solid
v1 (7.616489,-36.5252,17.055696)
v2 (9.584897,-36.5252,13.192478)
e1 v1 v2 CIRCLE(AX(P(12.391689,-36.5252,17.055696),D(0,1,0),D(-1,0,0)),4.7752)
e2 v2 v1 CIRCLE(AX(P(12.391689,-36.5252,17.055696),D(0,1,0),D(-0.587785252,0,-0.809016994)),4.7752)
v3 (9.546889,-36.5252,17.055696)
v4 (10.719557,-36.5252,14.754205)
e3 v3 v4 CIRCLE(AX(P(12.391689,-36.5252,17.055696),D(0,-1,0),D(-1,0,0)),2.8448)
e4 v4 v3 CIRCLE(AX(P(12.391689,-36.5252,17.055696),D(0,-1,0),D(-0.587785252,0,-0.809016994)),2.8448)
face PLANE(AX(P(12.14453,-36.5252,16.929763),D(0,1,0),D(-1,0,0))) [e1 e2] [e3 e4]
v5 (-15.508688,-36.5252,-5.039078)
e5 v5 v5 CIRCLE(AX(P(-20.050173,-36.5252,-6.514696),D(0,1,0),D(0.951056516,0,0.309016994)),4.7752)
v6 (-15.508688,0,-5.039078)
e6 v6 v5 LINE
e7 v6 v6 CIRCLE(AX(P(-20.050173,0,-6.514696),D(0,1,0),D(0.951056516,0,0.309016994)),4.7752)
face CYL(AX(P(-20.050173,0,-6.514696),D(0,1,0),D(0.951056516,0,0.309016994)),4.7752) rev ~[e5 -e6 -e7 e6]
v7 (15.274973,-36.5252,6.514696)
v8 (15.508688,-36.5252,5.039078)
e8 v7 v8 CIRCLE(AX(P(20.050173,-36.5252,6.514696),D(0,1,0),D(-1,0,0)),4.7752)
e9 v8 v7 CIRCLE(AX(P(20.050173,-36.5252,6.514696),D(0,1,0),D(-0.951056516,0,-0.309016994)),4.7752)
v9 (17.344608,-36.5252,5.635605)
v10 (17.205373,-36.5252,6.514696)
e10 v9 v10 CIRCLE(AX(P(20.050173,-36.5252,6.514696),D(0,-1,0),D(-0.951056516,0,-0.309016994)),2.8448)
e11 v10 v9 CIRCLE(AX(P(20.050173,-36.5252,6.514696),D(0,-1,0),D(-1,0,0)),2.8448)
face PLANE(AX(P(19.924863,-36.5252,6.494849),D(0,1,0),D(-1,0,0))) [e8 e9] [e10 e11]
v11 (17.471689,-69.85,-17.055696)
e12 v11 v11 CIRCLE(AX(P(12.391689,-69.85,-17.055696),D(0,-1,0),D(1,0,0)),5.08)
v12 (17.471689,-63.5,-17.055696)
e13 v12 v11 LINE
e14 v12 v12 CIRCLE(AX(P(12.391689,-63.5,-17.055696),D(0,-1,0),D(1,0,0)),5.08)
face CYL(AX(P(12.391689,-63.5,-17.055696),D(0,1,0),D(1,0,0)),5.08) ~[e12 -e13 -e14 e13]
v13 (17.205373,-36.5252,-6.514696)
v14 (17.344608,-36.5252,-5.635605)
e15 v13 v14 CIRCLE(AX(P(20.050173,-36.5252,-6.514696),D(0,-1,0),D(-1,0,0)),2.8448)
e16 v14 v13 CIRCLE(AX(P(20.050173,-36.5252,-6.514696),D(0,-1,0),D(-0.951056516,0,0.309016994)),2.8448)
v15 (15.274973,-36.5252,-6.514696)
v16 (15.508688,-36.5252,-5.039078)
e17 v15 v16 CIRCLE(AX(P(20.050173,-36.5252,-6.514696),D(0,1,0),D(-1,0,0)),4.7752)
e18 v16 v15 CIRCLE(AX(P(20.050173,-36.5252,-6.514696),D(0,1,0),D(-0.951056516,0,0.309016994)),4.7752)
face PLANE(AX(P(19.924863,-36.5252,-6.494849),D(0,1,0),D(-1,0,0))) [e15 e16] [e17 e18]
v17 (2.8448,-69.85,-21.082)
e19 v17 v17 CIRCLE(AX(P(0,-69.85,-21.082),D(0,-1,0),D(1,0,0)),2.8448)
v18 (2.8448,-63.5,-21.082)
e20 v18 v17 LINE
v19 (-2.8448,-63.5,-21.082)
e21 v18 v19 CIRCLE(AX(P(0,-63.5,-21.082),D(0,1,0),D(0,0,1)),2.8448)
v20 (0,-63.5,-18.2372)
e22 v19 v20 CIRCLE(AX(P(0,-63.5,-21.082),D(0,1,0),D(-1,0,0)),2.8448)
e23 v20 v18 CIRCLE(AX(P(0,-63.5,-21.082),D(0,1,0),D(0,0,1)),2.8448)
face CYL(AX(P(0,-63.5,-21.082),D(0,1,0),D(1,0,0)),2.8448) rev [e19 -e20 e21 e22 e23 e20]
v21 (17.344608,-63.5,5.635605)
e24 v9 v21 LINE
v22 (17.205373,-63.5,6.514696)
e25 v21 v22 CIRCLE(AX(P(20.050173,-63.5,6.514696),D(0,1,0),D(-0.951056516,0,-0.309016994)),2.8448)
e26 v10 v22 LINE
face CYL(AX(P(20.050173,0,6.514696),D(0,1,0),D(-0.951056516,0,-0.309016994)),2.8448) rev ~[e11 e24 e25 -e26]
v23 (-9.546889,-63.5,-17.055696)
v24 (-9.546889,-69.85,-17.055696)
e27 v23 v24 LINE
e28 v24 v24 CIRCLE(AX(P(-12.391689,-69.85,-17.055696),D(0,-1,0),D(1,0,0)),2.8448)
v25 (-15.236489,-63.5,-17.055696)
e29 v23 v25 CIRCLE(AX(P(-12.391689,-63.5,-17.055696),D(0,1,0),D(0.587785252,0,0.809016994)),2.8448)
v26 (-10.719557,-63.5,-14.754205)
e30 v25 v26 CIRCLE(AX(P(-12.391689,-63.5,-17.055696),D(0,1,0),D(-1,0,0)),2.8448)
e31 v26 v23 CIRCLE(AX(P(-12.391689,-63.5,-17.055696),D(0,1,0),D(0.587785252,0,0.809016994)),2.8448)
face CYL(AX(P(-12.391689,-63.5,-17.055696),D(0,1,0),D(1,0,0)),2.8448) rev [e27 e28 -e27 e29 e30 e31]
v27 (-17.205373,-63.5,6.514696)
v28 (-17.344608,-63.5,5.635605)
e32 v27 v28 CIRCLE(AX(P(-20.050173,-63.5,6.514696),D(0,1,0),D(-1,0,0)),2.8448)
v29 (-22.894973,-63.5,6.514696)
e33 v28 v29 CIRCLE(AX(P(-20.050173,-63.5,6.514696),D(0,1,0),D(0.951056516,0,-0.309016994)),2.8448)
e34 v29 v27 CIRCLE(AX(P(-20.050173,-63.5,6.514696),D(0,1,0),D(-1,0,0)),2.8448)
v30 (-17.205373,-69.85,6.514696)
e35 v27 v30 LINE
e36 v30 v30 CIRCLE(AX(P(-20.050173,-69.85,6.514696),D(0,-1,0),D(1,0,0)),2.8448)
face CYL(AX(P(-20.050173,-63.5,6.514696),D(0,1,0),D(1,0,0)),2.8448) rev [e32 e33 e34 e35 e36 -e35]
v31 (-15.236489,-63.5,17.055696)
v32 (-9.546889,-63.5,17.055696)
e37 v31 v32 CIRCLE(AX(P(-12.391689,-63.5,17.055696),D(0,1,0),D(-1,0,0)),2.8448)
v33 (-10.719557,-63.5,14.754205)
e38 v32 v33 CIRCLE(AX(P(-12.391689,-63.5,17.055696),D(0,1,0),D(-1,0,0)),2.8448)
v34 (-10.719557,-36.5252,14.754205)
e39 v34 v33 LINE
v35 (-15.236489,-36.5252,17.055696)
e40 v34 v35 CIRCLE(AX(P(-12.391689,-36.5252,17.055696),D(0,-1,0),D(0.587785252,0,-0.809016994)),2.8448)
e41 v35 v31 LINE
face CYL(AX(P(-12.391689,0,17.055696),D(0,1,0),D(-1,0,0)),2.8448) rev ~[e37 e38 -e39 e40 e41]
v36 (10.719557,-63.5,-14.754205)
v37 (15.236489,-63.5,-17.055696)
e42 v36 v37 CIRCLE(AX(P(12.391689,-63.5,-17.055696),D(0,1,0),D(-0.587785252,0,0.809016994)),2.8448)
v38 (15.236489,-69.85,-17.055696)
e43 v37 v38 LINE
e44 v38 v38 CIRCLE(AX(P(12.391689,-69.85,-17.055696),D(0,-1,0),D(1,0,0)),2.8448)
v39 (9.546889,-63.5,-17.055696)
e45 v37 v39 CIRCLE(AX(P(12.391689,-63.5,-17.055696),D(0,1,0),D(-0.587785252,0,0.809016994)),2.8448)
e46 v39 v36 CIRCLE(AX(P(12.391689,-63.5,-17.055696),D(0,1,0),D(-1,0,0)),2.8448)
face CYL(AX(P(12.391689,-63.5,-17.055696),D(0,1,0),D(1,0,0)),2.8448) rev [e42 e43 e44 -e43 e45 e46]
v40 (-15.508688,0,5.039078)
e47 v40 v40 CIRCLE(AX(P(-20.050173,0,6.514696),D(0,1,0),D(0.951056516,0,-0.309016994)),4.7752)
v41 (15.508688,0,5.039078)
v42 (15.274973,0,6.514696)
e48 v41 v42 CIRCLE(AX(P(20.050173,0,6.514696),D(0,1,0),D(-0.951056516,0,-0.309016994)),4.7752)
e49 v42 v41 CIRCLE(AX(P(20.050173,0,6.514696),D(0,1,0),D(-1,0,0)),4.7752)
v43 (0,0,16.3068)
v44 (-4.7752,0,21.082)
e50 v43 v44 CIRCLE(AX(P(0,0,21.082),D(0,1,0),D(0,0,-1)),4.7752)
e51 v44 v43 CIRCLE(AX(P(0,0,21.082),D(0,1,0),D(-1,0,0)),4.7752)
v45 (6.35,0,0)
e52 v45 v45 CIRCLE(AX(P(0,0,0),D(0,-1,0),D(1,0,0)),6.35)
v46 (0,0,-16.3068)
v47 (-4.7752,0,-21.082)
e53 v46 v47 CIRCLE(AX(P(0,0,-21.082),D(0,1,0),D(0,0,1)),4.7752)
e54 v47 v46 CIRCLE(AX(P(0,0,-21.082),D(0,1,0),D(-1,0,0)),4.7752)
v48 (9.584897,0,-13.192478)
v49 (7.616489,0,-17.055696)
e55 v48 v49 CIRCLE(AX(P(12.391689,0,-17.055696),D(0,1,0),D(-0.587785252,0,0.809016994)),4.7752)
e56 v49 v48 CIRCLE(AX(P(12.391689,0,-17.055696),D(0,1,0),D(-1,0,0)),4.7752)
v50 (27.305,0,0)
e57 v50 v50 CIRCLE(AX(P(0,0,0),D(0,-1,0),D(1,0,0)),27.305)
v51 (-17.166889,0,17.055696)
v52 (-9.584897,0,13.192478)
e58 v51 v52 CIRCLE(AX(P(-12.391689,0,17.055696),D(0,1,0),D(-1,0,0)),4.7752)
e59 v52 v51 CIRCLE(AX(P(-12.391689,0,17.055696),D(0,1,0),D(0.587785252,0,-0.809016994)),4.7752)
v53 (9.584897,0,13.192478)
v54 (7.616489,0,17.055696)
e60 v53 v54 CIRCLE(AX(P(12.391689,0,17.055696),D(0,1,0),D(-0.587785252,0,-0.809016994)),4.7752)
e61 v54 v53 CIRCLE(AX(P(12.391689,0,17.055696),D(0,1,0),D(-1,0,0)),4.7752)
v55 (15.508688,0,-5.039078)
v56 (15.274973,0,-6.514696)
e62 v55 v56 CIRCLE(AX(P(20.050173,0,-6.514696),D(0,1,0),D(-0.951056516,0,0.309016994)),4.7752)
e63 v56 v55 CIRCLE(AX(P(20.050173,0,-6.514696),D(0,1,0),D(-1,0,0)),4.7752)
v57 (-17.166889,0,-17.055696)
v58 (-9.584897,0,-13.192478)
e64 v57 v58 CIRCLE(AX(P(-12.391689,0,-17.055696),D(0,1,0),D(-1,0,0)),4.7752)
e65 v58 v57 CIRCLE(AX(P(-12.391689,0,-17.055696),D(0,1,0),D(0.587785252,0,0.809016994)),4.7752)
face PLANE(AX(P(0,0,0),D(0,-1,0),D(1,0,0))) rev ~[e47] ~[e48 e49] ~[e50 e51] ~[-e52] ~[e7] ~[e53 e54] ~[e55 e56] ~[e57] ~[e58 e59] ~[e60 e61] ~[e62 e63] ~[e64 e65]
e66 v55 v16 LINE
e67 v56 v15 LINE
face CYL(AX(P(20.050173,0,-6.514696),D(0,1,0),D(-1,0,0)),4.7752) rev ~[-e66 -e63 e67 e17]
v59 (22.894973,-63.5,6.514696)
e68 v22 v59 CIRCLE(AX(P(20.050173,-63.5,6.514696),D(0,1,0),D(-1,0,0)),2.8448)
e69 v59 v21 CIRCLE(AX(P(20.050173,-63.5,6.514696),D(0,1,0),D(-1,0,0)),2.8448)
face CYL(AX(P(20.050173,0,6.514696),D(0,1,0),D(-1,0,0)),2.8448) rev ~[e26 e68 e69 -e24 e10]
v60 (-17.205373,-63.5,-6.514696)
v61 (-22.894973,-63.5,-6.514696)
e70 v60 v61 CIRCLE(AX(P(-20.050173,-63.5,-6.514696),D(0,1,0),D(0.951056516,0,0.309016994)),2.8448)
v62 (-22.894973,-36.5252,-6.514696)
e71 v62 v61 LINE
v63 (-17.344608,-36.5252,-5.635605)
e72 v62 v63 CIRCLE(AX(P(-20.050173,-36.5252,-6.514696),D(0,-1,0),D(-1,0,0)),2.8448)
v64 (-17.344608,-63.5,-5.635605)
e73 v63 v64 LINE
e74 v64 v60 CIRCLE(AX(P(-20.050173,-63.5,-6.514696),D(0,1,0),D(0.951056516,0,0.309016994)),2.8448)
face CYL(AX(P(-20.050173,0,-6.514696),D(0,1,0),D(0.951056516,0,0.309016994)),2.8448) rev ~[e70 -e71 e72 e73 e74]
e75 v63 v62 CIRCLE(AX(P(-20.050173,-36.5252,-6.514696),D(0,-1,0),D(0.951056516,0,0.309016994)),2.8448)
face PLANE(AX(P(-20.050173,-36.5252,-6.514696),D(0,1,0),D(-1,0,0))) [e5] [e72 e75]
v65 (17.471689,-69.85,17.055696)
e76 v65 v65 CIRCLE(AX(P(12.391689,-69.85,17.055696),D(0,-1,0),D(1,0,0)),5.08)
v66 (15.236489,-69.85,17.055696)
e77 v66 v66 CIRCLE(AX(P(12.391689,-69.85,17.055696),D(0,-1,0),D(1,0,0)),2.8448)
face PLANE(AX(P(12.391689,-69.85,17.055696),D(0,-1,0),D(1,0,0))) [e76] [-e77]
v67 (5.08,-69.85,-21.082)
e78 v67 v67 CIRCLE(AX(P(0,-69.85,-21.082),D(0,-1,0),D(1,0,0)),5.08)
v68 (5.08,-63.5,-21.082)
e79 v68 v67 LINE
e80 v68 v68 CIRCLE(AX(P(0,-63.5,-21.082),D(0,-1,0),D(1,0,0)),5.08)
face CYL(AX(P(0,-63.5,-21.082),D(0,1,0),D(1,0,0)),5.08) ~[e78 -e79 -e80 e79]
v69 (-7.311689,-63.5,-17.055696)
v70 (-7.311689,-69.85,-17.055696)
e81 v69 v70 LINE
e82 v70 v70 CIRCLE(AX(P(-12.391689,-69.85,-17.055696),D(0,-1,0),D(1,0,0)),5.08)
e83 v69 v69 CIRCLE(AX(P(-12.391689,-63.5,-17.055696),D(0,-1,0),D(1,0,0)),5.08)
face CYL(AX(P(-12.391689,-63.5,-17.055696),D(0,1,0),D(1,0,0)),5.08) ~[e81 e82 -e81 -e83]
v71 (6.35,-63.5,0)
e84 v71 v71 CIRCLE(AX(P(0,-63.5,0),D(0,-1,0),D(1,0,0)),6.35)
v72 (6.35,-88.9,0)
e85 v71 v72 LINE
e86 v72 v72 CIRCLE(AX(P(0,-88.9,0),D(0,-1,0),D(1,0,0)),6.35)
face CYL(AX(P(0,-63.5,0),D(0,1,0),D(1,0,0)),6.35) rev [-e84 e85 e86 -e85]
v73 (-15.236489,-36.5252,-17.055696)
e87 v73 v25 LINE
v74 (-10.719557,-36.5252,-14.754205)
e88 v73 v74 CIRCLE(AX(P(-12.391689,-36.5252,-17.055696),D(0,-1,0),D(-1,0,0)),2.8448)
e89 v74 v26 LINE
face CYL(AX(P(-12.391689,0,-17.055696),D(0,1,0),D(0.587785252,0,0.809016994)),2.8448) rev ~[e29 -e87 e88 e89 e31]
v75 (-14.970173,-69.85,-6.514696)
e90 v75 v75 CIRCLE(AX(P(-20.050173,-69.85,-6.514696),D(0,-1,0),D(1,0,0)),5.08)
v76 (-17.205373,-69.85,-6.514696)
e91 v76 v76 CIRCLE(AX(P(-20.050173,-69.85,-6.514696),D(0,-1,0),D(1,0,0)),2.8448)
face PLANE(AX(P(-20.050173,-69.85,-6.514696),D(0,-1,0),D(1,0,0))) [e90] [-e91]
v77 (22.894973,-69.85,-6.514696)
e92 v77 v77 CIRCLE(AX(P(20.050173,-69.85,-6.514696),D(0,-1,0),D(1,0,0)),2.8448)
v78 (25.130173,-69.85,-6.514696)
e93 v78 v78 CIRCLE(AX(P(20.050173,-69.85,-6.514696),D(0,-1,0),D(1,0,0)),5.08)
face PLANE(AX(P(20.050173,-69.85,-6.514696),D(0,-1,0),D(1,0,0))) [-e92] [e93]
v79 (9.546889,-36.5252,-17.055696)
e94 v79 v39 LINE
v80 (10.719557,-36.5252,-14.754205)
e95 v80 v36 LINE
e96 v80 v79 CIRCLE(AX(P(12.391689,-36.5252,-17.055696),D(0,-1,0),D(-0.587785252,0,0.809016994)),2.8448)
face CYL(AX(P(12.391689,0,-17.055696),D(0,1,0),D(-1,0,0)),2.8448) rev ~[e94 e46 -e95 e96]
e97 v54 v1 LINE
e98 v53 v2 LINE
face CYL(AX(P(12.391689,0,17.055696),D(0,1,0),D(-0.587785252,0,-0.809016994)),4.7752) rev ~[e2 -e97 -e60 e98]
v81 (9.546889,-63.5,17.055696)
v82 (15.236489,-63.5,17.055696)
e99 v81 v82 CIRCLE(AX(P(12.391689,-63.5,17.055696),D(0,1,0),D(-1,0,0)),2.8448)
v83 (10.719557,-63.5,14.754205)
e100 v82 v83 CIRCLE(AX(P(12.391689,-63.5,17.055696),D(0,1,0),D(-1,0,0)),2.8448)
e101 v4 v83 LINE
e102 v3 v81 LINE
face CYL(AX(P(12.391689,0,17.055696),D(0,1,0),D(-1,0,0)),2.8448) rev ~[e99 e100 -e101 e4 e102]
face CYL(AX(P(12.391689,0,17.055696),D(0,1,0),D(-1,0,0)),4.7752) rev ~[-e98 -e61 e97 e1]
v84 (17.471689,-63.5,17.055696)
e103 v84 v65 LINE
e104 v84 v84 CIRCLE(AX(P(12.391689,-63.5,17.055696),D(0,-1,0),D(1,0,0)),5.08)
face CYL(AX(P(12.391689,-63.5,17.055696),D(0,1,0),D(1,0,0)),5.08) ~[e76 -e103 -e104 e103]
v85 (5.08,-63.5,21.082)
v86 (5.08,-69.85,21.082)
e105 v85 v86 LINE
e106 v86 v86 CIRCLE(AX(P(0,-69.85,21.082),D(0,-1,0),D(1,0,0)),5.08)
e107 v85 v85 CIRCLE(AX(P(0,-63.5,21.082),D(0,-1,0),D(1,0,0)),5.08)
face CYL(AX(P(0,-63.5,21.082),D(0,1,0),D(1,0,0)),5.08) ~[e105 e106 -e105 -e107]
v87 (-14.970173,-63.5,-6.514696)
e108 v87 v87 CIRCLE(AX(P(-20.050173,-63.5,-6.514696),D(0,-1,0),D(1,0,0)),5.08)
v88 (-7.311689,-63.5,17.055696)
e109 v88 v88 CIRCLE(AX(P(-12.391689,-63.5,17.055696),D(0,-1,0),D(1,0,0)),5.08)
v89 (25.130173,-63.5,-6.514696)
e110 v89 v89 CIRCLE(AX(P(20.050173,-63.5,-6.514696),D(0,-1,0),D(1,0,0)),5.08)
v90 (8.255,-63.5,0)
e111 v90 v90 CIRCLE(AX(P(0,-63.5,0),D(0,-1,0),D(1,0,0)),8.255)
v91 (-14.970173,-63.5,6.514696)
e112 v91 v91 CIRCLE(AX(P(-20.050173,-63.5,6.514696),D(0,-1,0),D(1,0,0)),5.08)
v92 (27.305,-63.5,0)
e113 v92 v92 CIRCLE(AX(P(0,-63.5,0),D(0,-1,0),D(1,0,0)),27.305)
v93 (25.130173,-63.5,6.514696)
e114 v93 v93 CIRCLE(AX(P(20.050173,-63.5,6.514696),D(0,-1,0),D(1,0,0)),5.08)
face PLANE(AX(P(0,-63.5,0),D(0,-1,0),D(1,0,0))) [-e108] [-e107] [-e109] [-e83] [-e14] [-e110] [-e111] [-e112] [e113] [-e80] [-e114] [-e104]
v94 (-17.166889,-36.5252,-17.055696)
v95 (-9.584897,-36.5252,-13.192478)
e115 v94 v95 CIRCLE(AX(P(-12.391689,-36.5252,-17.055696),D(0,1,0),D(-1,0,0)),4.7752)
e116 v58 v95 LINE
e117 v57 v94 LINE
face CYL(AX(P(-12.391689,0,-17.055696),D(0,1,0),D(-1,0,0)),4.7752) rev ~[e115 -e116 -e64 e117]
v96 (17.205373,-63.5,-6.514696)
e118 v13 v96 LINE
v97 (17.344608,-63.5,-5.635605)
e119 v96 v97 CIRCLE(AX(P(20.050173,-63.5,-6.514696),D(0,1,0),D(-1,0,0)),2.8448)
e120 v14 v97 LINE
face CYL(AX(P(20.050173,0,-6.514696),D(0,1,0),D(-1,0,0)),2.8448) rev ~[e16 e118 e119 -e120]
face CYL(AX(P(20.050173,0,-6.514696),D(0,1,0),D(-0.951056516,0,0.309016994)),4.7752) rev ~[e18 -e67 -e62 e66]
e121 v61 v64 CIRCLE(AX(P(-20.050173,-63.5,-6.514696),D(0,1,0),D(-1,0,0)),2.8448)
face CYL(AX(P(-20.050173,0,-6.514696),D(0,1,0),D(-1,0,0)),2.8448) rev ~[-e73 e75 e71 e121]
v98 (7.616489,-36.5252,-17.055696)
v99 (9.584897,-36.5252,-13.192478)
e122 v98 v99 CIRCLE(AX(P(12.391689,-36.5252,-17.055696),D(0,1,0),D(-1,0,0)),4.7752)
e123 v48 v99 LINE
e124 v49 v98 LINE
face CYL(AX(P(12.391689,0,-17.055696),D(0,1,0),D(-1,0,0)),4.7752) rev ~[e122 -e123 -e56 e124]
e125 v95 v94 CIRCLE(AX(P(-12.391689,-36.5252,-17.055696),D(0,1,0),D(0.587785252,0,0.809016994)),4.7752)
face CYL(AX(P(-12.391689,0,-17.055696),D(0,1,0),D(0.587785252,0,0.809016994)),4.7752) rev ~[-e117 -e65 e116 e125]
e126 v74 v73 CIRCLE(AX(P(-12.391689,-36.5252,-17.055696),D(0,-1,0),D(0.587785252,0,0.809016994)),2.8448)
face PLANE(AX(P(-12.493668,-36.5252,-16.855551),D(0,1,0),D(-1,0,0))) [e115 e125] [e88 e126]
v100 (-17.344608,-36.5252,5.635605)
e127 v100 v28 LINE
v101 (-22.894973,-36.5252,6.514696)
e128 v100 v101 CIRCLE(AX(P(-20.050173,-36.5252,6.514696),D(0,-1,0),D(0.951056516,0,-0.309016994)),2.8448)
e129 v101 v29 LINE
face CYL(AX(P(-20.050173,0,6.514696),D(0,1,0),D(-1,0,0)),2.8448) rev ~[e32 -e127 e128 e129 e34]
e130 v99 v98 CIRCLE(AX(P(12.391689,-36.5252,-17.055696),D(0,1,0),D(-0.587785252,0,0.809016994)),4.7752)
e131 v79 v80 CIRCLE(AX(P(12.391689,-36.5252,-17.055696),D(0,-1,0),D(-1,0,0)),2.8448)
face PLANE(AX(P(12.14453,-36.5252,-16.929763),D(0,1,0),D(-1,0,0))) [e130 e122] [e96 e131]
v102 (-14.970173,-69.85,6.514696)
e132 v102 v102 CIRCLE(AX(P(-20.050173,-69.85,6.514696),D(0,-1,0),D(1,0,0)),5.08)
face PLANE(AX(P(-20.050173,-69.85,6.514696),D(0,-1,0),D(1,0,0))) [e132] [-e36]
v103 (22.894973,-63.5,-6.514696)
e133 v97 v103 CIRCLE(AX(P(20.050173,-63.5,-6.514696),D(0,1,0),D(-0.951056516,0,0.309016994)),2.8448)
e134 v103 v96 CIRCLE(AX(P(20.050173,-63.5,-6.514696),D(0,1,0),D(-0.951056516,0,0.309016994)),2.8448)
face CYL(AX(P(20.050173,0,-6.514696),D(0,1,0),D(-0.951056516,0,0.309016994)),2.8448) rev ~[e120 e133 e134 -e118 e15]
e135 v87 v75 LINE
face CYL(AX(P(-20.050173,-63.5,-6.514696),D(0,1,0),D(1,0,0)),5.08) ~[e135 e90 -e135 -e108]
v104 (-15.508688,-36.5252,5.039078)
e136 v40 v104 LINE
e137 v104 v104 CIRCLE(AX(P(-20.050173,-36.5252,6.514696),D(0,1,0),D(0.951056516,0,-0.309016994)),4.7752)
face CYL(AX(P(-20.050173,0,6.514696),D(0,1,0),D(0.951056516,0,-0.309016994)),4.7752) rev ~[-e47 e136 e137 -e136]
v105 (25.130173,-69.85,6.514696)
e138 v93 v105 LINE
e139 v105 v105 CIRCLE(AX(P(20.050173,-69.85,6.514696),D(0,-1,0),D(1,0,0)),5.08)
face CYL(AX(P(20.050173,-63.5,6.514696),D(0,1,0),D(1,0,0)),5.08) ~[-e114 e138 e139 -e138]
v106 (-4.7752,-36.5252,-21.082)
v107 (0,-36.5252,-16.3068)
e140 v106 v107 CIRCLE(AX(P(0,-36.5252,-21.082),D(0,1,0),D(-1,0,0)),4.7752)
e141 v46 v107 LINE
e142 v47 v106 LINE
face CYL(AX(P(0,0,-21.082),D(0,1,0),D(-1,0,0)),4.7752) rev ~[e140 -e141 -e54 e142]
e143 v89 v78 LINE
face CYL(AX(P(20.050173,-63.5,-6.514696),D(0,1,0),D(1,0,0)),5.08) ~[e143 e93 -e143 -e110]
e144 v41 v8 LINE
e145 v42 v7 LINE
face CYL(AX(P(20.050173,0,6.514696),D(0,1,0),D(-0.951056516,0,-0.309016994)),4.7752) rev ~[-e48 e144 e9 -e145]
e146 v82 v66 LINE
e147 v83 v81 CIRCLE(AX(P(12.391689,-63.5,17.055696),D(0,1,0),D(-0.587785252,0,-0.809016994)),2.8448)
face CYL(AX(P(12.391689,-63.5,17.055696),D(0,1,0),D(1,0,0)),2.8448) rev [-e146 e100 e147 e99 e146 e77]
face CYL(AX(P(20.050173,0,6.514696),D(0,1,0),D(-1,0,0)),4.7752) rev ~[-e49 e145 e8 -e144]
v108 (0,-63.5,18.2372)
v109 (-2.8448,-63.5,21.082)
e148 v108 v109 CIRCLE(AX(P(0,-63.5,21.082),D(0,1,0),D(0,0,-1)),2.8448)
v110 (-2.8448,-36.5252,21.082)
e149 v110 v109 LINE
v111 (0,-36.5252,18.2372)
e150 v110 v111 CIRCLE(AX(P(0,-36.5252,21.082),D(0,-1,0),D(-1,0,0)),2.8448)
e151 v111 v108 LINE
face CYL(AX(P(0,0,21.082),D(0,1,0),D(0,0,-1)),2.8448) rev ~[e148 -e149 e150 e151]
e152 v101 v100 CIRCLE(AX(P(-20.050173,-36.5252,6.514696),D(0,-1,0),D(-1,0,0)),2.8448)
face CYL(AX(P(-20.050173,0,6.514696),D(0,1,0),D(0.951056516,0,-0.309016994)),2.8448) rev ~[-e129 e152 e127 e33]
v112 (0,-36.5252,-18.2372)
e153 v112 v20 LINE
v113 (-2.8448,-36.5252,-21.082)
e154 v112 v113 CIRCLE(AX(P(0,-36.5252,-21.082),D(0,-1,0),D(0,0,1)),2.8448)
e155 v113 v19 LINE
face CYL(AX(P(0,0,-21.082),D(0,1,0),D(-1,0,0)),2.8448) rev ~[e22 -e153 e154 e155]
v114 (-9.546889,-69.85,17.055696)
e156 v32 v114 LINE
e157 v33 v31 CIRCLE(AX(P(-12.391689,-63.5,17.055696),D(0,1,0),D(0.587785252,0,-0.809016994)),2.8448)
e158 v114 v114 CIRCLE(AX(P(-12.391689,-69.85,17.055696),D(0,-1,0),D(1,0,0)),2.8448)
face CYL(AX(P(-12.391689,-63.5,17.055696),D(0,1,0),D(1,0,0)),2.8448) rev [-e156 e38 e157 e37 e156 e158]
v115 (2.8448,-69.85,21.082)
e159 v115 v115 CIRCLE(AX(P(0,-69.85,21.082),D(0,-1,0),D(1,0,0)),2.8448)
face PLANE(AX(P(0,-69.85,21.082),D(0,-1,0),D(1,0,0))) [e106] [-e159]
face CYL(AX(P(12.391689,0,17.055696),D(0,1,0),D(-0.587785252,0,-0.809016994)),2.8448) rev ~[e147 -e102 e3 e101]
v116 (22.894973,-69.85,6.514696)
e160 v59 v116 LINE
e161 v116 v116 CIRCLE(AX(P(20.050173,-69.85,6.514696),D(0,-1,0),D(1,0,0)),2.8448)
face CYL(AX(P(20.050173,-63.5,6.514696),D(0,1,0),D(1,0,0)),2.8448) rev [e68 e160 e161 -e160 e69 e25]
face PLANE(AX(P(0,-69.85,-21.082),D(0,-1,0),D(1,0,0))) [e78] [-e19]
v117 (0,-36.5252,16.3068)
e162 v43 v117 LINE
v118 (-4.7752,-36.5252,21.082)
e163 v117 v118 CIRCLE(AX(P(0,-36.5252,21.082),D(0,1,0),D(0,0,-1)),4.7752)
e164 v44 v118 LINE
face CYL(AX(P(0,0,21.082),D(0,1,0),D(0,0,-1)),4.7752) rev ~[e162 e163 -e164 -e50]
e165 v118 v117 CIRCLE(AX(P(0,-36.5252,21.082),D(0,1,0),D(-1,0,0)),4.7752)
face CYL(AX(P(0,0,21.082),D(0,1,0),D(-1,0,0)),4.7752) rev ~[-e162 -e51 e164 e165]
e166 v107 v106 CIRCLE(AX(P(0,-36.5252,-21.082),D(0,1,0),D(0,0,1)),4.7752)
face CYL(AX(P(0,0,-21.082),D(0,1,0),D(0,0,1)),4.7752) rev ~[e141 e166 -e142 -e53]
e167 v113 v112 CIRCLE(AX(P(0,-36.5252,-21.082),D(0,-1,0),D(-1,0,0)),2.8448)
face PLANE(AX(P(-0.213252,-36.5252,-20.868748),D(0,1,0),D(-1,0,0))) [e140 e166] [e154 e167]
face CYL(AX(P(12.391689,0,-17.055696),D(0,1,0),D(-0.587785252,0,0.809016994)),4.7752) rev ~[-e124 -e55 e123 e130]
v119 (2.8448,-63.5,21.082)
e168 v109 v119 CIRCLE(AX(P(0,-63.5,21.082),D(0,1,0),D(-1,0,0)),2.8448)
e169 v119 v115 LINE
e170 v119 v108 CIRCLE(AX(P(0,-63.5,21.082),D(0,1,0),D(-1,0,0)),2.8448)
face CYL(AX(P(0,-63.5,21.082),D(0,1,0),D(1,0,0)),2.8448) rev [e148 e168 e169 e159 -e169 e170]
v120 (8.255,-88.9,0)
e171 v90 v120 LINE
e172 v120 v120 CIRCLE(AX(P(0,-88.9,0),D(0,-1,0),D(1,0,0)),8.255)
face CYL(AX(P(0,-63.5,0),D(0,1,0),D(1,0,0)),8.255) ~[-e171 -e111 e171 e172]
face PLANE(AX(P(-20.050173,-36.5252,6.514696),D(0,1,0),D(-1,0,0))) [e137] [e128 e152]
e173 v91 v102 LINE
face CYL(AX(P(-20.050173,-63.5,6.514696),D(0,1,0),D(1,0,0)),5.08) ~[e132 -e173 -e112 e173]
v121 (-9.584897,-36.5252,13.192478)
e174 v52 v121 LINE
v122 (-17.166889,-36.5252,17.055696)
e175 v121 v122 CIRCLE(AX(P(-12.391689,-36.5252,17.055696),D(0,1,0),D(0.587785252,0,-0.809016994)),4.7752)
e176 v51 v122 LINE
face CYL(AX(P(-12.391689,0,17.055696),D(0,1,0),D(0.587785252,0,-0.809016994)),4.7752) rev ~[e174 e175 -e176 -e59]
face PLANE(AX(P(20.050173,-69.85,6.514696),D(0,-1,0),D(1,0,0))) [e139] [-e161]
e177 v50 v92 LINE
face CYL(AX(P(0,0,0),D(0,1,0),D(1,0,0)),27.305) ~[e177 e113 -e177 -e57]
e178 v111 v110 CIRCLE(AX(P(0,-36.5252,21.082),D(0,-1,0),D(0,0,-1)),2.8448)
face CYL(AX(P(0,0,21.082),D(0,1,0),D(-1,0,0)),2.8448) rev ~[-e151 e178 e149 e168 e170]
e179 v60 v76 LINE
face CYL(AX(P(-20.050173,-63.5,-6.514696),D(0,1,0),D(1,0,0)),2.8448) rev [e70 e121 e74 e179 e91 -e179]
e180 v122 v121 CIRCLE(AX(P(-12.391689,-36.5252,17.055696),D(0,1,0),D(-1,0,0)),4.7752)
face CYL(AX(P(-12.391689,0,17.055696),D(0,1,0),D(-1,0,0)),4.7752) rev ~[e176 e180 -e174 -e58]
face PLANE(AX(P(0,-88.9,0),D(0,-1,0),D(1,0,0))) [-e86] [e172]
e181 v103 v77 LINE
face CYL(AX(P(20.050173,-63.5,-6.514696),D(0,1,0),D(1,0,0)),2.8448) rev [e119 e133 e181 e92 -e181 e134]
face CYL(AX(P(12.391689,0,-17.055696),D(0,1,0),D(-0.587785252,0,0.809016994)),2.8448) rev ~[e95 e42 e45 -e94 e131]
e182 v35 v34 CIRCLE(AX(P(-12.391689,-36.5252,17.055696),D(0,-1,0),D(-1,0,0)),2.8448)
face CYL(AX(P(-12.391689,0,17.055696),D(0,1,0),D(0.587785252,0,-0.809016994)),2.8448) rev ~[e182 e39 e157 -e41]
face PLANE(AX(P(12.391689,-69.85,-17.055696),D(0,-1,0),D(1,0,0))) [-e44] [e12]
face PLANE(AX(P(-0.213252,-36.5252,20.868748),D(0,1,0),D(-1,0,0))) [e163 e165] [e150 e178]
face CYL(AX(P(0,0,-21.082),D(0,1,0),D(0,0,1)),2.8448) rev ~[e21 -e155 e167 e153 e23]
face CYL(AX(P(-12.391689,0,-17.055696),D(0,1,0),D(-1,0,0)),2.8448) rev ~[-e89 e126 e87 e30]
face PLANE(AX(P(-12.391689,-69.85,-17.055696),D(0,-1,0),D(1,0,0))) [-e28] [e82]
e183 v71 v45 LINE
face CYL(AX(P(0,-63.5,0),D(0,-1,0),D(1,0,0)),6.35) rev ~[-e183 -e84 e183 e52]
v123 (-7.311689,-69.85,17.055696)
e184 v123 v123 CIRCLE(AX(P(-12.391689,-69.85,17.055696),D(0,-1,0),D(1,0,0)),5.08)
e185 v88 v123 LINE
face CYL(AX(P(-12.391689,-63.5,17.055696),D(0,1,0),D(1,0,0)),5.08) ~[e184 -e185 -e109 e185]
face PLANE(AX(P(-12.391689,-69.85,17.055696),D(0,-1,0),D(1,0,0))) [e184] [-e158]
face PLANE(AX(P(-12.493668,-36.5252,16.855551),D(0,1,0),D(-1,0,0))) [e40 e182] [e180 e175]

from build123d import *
from build123d import SkipClean  # not in build123d's __all__

# Parameters (mm, degrees)
F0_R     = 27.305
F1_DEPTH = 63.5
F3_DEPTH = 86.614
F4_R     = 5.08
F4_R_2   = 2.8448
F5_DEPTH = 6.35
F6_R     = 8.255
F6_R_2   = 6.35
F7_DEPTH = 25.4
F8_DEPTH = 36.5252
F9_DEPTH = 133.35


# Not quite as in the source:
# - after a boolean that leaves OpenCascade's solid faulty, fix() repairs it


with BuildPart() as f1:
    # F0 (on Front) → F1 (new body)
    with BuildSketch(Plane.XZ):
        Circle(F0_R)
    extrude(amount=F1_DEPTH)

    # F2 (on face) → F3 (cut)
    with BuildSketch(Plane(origin=(0, 0, 0), x_dir=(-1, 0, 0), z_dir=(0, 1, 0))):
        with BuildLine():
            ThreePointArc((-17.2053734765, -6.5146962754), (-17.2403976852, -6.0696715093), (-17.344607899, -5.6356047298))
            ThreePointArc((-17.344607899, -5.6356047298), (-22.8599492679, -6.9597210416), (-17.2053734765, -6.5146962754))
        make_face()
        with BuildLine():
            ThreePointArc((-17.2053734765, 6.5146962754), (-22.8599492679, 6.9597210416), (-17.344607899, 5.6356047298))
            ThreePointArc((-17.344607899, 5.6356047298), (-17.2403976852, 6.0696715093), (-17.2053734765, 6.5146962754))
        make_face()
        with BuildLine():
            ThreePointArc((-9.5468886888, 17.0556962754), (-14.9264240488, 18.3472084491), (-10.7195572031, 14.7542047298))
            ThreePointArc((-10.7195572031, 14.7542047298), (-9.8569533288, 15.7641841018), (-9.5468886888, 17.0556962754))
        make_face()
        with BuildLine():
            ThreePointArc((2.8448, 21.082), (-2.0115773711, 23.0935773711), (0, 18.2372))
            ThreePointArc((0, 18.2372), (2.0115773711, 19.0704226289), (2.8448, 21.082))
        make_face()
        with BuildLine():
            ThreePointArc((15.2364886888, 17.0556962754), (11.1001765152, 19.5904316354), (10.7195572031, 14.7542047298))
            ThreePointArc((10.7195572031, 14.7542047298), (13.6832008625, 14.5209609154), (15.2364886888, 17.0556962754))
        make_face()
        with BuildLine():
            ThreePointArc((22.8949734765, 6.5146962754), (19.6051487104, 9.3244720667), (17.344607899, 5.6356047298))
            ThreePointArc((17.344607899, 5.6356047298), (20.4951982427, 3.7049204841), (22.8949734765, 6.5146962754))
        make_face()
        with BuildLine():
            ThreePointArc((22.8949734765, -6.5146962754), (20.4951982427, -3.7049204841), (17.344607899, -5.6356047298))
            ThreePointArc((17.344607899, -5.6356047298), (19.6051487104, -9.3244720667), (22.8949734765, -6.5146962754))
        make_face()
        with BuildLine():
            ThreePointArc((15.2364886888, -17.0556962754), (13.6832008625, -14.5209609154), (10.7195572031, -14.7542047298))
            ThreePointArc((10.7195572031, -14.7542047298), (11.1001765152, -19.5904316354), (15.2364886888, -17.0556962754))
        make_face()
        with BuildLine():
            ThreePointArc((2.8448, -21.082), (2.0115773711, -19.0704226289), (0, -18.2372))
            ThreePointArc((0, -18.2372), (-2.0115773711, -23.0935773711), (2.8448, -21.082))
        make_face()
        with BuildLine():
            ThreePointArc((-9.5468886888, -17.0556962754), (-9.8569533288, -15.7641841018), (-10.7195572031, -14.7542047298))
            ThreePointArc((-10.7195572031, -14.7542047298), (-14.9264240488, -18.3472084491), (-9.5468886888, -17.0556962754))
        make_face()
    extrude(amount=-F3_DEPTH, mode=Mode.SUBTRACT)

    # F4 (on face) → F5 (join)
    with BuildSketch(Plane.XZ.offset(63.5)):
        with Locations((0, 21.082)):
            Circle(F4_R)
        with Locations((0, 21.082)):
            Circle(F4_R_2, mode=Mode.SUBTRACT)
        with Locations((12.3916886888, 17.0556962754)):
            Circle(F4_R)
        with Locations((12.3916886888, 17.0556962754)):
            Circle(F4_R_2, mode=Mode.SUBTRACT)
        with Locations((20.0501734765, 6.5146962754)):
            Circle(F4_R)
        with Locations((20.0501734765, 6.5146962754)):
            Circle(F4_R_2, mode=Mode.SUBTRACT)
        with Locations((20.0501734765, -6.5146962754)):
            Circle(F4_R)
        with Locations((20.0501734765, -6.5146962754)):
            Circle(F4_R_2, mode=Mode.SUBTRACT)
        with Locations((12.3916886888, -17.0556962754)):
            Circle(F4_R)
        with Locations((12.3916886888, -17.0556962754)):
            Circle(F4_R_2, mode=Mode.SUBTRACT)
        with Locations((0, -21.082)):
            Circle(F4_R)
        with Locations((0, -21.082)):
            Circle(F4_R_2, mode=Mode.SUBTRACT)
        with Locations((-12.3916886888, -17.0556962754)):
            Circle(F4_R)
        with Locations((-12.3916886888, -17.0556962754)):
            Circle(F4_R_2, mode=Mode.SUBTRACT)
        with Locations((-20.0501734765, -6.5146962754)):
            Circle(F4_R)
        with Locations((-20.0501734765, -6.5146962754)):
            Circle(F4_R_2, mode=Mode.SUBTRACT)
        with Locations((-20.0501734765, 6.5146962754)):
            Circle(F4_R)
        with Locations((-20.0501734765, 6.5146962754)):
            Circle(F4_R_2, mode=Mode.SUBTRACT)
        with Locations((-12.3916886888, 17.0556962754)):
            Circle(F4_R)
        with Locations((-12.3916886888, 17.0556962754)):
            Circle(F4_R_2, mode=Mode.SUBTRACT)
    with SkipClean():  # cleaning this boolean's faces spoils the solid; the shape is the same uncleaned
        extrude(amount=F5_DEPTH)

    # F6 (on face) → F7 (join)
    with BuildSketch(Plane.XZ.offset(63.5)):
        Circle(F6_R)
        Circle(F6_R_2, mode=Mode.SUBTRACT)
    extrude(amount=F7_DEPTH)

    add(f1.part.fix(), mode=Mode.REPLACE)

    # F2 (on face) → F8 (cut)
    with BuildSketch(Plane(origin=(0, 0, 0), x_dir=(-1, 0, 0), z_dir=(0, 1, 0))):
        with BuildLine():
            ThreePointArc((-7.6164886888, 17.0556962754), (-16.6464230431, 19.2235917098), (-9.5848965521, 13.1924783239))
            ThreePointArc((-9.5848965521, 13.1924783239), (-8.1369543345, 14.8878008411), (-7.6164886888, 17.0556962754))
        make_face()
        with BuildLine():
            ThreePointArc((-9.5468886888, 17.0556962754), (-9.8569533288, 15.7641841018), (-10.7195572031, 14.7542047298))
            ThreePointArc((-10.7195572031, 14.7542047298), (-14.9264240488, 18.3472084491), (-9.5468886888, 17.0556962754))
        make_face(mode=Mode.SUBTRACT)
        with BuildLine():
            ThreePointArc((4.7752, 21.082), (-3.3765763015, 24.4585763015), (0, 16.3068))
            ThreePointArc((0, 16.3068), (3.3765763015, 17.7054236985), (4.7752, 21.082))
        make_face()
        with BuildLine():
            ThreePointArc((2.8448, 21.082), (2.0115773711, 19.0704226289), (0, 18.2372))
            ThreePointArc((0, 18.2372), (-2.0115773711, 23.0935773711), (2.8448, 21.082))
        make_face(mode=Mode.SUBTRACT)
        with BuildLine():
            ThreePointArc((17.1668886888, 17.0556962754), (10.2237932545, 21.3104306297), (9.5848965521, 13.1924783239))
            ThreePointArc((9.5848965521, 13.1924783239), (14.5595841232, 12.8009619211), (17.1668886888, 17.0556962754))
        make_face()
        with BuildLine():
            ThreePointArc((15.2364886888, 17.0556962754), (13.6832008625, 14.5209609154), (10.7195572031, 14.7542047298))
            ThreePointArc((10.7195572031, 14.7542047298), (11.1001765152, 19.5904316354), (15.2364886888, 17.0556962754))
        make_face(mode=Mode.SUBTRACT)
        with BuildLine():
            ThreePointArc((24.8253734765, 6.5146962754), (19.3031676191, 11.2311056394), (15.5086883999, 5.0390783239))
            ThreePointArc((15.5086883999, 5.0390783239), (20.797179334, 1.7982869114), (24.8253734765, 6.5146962754))
        make_face()
        with BuildLine():
            ThreePointArc((22.8949734765, 6.5146962754), (20.4951982427, 3.7049204841), (17.344607899, 5.6356047298))
            ThreePointArc((17.344607899, 5.6356047298), (19.6051487104, 9.3244720667), (22.8949734765, 6.5146962754))
        make_face(mode=Mode.SUBTRACT)
        with BuildLine():
            ThreePointArc((24.8253734765, -6.5146962754), (20.797179334, -1.7982869114), (15.5086883999, -5.0390783239))
            ThreePointArc((15.5086883999, -5.0390783239), (19.3031676191, -11.2311056394), (24.8253734765, -6.5146962754))
        make_face()
        with BuildLine():
            ThreePointArc((22.8949734765, -6.5146962754), (19.6051487104, -9.3244720667), (17.344607899, -5.6356047298))
            ThreePointArc((17.344607899, -5.6356047298), (20.4951982427, -3.7049204841), (22.8949734765, -6.5146962754))
        make_face(mode=Mode.SUBTRACT)
        with BuildLine():
            ThreePointArc((17.1668886888, -17.0556962754), (14.5595841232, -12.8009619211), (9.5848965521, -13.1924783239))
            ThreePointArc((9.5848965521, -13.1924783239), (10.2237932545, -21.3104306297), (17.1668886888, -17.0556962754))
        make_face()
        with BuildLine():
            ThreePointArc((15.2364886888, -17.0556962754), (11.1001765152, -19.5904316354), (10.7195572031, -14.7542047298))
            ThreePointArc((10.7195572031, -14.7542047298), (13.6832008625, -14.5209609154), (15.2364886888, -17.0556962754))
        make_face(mode=Mode.SUBTRACT)
        with BuildLine():
            ThreePointArc((4.7752, -21.082), (3.3765763015, -17.7054236985), (0, -16.3068))
            ThreePointArc((0, -16.3068), (-3.3765763015, -24.4585763015), (4.7752, -21.082))
        make_face()
        with BuildLine():
            ThreePointArc((2.8448, -21.082), (-2.0115773711, -23.0935773711), (0, -18.2372))
            ThreePointArc((0, -18.2372), (2.0115773711, -19.0704226289), (2.8448, -21.082))
        make_face(mode=Mode.SUBTRACT)
        with BuildLine():
            ThreePointArc((-7.6164886888, -17.0556962754), (-8.1369543345, -14.8878008411), (-9.5848965521, -13.1924783239))
            ThreePointArc((-9.5848965521, -13.1924783239), (-16.6464230431, -19.2235917098), (-7.6164886888, -17.0556962754))
        make_face()
        with BuildLine():
            ThreePointArc((-9.5468886888, -17.0556962754), (-14.9264240488, -18.3472084491), (-10.7195572031, -14.7542047298))
            ThreePointArc((-10.7195572031, -14.7542047298), (-9.8569533288, -15.7641841018), (-9.5468886888, -17.0556962754))
        make_face(mode=Mode.SUBTRACT)
        with BuildLine():
            ThreePointArc((-15.2749734765, -6.5146962754), (-15.3337641125, -5.767690418), (-15.5086883999, -5.0390783239))
            ThreePointArc((-15.5086883999, -5.0390783239), (-24.7665828405, -7.2617021329), (-15.2749734765, -6.5146962754))
        make_face()
        with BuildLine():
            ThreePointArc((-17.2053734765, -6.5146962754), (-22.8599492679, -6.9597210416), (-17.344607899, -5.6356047298))
            ThreePointArc((-17.344607899, -5.6356047298), (-17.2403976852, -6.0696715093), (-17.2053734765, -6.5146962754))
        make_face(mode=Mode.SUBTRACT)
        with BuildLine():
            ThreePointArc((-15.2749734765, 6.5146962754), (-24.7665828405, 7.2617021329), (-15.5086883999, 5.0390783239))
            ThreePointArc((-15.5086883999, 5.0390783239), (-15.3337641125, 5.767690418), (-15.2749734765, 6.5146962754))
        make_face()
        with BuildLine():
            ThreePointArc((-17.2053734765, 6.5146962754), (-17.2403976852, 6.0696715093), (-17.344607899, 5.6356047298))
            ThreePointArc((-17.344607899, 5.6356047298), (-22.8599492679, 6.9597210416), (-17.2053734765, 6.5146962754))
        make_face(mode=Mode.SUBTRACT)
    extrude(amount=-F8_DEPTH, mode=Mode.SUBTRACT)

    add(f1.part.fix(), mode=Mode.REPLACE)

    # F9 (cut): a face of the model
    f9_faces = [f1.faces().sort_by_distance(p)[0] for p in [
        (0, -63.5, 0),
    ]]
    extrude(f9_faces, amount=-F9_DEPTH, mode=Mode.SUBTRACT)


solid = f1.part
